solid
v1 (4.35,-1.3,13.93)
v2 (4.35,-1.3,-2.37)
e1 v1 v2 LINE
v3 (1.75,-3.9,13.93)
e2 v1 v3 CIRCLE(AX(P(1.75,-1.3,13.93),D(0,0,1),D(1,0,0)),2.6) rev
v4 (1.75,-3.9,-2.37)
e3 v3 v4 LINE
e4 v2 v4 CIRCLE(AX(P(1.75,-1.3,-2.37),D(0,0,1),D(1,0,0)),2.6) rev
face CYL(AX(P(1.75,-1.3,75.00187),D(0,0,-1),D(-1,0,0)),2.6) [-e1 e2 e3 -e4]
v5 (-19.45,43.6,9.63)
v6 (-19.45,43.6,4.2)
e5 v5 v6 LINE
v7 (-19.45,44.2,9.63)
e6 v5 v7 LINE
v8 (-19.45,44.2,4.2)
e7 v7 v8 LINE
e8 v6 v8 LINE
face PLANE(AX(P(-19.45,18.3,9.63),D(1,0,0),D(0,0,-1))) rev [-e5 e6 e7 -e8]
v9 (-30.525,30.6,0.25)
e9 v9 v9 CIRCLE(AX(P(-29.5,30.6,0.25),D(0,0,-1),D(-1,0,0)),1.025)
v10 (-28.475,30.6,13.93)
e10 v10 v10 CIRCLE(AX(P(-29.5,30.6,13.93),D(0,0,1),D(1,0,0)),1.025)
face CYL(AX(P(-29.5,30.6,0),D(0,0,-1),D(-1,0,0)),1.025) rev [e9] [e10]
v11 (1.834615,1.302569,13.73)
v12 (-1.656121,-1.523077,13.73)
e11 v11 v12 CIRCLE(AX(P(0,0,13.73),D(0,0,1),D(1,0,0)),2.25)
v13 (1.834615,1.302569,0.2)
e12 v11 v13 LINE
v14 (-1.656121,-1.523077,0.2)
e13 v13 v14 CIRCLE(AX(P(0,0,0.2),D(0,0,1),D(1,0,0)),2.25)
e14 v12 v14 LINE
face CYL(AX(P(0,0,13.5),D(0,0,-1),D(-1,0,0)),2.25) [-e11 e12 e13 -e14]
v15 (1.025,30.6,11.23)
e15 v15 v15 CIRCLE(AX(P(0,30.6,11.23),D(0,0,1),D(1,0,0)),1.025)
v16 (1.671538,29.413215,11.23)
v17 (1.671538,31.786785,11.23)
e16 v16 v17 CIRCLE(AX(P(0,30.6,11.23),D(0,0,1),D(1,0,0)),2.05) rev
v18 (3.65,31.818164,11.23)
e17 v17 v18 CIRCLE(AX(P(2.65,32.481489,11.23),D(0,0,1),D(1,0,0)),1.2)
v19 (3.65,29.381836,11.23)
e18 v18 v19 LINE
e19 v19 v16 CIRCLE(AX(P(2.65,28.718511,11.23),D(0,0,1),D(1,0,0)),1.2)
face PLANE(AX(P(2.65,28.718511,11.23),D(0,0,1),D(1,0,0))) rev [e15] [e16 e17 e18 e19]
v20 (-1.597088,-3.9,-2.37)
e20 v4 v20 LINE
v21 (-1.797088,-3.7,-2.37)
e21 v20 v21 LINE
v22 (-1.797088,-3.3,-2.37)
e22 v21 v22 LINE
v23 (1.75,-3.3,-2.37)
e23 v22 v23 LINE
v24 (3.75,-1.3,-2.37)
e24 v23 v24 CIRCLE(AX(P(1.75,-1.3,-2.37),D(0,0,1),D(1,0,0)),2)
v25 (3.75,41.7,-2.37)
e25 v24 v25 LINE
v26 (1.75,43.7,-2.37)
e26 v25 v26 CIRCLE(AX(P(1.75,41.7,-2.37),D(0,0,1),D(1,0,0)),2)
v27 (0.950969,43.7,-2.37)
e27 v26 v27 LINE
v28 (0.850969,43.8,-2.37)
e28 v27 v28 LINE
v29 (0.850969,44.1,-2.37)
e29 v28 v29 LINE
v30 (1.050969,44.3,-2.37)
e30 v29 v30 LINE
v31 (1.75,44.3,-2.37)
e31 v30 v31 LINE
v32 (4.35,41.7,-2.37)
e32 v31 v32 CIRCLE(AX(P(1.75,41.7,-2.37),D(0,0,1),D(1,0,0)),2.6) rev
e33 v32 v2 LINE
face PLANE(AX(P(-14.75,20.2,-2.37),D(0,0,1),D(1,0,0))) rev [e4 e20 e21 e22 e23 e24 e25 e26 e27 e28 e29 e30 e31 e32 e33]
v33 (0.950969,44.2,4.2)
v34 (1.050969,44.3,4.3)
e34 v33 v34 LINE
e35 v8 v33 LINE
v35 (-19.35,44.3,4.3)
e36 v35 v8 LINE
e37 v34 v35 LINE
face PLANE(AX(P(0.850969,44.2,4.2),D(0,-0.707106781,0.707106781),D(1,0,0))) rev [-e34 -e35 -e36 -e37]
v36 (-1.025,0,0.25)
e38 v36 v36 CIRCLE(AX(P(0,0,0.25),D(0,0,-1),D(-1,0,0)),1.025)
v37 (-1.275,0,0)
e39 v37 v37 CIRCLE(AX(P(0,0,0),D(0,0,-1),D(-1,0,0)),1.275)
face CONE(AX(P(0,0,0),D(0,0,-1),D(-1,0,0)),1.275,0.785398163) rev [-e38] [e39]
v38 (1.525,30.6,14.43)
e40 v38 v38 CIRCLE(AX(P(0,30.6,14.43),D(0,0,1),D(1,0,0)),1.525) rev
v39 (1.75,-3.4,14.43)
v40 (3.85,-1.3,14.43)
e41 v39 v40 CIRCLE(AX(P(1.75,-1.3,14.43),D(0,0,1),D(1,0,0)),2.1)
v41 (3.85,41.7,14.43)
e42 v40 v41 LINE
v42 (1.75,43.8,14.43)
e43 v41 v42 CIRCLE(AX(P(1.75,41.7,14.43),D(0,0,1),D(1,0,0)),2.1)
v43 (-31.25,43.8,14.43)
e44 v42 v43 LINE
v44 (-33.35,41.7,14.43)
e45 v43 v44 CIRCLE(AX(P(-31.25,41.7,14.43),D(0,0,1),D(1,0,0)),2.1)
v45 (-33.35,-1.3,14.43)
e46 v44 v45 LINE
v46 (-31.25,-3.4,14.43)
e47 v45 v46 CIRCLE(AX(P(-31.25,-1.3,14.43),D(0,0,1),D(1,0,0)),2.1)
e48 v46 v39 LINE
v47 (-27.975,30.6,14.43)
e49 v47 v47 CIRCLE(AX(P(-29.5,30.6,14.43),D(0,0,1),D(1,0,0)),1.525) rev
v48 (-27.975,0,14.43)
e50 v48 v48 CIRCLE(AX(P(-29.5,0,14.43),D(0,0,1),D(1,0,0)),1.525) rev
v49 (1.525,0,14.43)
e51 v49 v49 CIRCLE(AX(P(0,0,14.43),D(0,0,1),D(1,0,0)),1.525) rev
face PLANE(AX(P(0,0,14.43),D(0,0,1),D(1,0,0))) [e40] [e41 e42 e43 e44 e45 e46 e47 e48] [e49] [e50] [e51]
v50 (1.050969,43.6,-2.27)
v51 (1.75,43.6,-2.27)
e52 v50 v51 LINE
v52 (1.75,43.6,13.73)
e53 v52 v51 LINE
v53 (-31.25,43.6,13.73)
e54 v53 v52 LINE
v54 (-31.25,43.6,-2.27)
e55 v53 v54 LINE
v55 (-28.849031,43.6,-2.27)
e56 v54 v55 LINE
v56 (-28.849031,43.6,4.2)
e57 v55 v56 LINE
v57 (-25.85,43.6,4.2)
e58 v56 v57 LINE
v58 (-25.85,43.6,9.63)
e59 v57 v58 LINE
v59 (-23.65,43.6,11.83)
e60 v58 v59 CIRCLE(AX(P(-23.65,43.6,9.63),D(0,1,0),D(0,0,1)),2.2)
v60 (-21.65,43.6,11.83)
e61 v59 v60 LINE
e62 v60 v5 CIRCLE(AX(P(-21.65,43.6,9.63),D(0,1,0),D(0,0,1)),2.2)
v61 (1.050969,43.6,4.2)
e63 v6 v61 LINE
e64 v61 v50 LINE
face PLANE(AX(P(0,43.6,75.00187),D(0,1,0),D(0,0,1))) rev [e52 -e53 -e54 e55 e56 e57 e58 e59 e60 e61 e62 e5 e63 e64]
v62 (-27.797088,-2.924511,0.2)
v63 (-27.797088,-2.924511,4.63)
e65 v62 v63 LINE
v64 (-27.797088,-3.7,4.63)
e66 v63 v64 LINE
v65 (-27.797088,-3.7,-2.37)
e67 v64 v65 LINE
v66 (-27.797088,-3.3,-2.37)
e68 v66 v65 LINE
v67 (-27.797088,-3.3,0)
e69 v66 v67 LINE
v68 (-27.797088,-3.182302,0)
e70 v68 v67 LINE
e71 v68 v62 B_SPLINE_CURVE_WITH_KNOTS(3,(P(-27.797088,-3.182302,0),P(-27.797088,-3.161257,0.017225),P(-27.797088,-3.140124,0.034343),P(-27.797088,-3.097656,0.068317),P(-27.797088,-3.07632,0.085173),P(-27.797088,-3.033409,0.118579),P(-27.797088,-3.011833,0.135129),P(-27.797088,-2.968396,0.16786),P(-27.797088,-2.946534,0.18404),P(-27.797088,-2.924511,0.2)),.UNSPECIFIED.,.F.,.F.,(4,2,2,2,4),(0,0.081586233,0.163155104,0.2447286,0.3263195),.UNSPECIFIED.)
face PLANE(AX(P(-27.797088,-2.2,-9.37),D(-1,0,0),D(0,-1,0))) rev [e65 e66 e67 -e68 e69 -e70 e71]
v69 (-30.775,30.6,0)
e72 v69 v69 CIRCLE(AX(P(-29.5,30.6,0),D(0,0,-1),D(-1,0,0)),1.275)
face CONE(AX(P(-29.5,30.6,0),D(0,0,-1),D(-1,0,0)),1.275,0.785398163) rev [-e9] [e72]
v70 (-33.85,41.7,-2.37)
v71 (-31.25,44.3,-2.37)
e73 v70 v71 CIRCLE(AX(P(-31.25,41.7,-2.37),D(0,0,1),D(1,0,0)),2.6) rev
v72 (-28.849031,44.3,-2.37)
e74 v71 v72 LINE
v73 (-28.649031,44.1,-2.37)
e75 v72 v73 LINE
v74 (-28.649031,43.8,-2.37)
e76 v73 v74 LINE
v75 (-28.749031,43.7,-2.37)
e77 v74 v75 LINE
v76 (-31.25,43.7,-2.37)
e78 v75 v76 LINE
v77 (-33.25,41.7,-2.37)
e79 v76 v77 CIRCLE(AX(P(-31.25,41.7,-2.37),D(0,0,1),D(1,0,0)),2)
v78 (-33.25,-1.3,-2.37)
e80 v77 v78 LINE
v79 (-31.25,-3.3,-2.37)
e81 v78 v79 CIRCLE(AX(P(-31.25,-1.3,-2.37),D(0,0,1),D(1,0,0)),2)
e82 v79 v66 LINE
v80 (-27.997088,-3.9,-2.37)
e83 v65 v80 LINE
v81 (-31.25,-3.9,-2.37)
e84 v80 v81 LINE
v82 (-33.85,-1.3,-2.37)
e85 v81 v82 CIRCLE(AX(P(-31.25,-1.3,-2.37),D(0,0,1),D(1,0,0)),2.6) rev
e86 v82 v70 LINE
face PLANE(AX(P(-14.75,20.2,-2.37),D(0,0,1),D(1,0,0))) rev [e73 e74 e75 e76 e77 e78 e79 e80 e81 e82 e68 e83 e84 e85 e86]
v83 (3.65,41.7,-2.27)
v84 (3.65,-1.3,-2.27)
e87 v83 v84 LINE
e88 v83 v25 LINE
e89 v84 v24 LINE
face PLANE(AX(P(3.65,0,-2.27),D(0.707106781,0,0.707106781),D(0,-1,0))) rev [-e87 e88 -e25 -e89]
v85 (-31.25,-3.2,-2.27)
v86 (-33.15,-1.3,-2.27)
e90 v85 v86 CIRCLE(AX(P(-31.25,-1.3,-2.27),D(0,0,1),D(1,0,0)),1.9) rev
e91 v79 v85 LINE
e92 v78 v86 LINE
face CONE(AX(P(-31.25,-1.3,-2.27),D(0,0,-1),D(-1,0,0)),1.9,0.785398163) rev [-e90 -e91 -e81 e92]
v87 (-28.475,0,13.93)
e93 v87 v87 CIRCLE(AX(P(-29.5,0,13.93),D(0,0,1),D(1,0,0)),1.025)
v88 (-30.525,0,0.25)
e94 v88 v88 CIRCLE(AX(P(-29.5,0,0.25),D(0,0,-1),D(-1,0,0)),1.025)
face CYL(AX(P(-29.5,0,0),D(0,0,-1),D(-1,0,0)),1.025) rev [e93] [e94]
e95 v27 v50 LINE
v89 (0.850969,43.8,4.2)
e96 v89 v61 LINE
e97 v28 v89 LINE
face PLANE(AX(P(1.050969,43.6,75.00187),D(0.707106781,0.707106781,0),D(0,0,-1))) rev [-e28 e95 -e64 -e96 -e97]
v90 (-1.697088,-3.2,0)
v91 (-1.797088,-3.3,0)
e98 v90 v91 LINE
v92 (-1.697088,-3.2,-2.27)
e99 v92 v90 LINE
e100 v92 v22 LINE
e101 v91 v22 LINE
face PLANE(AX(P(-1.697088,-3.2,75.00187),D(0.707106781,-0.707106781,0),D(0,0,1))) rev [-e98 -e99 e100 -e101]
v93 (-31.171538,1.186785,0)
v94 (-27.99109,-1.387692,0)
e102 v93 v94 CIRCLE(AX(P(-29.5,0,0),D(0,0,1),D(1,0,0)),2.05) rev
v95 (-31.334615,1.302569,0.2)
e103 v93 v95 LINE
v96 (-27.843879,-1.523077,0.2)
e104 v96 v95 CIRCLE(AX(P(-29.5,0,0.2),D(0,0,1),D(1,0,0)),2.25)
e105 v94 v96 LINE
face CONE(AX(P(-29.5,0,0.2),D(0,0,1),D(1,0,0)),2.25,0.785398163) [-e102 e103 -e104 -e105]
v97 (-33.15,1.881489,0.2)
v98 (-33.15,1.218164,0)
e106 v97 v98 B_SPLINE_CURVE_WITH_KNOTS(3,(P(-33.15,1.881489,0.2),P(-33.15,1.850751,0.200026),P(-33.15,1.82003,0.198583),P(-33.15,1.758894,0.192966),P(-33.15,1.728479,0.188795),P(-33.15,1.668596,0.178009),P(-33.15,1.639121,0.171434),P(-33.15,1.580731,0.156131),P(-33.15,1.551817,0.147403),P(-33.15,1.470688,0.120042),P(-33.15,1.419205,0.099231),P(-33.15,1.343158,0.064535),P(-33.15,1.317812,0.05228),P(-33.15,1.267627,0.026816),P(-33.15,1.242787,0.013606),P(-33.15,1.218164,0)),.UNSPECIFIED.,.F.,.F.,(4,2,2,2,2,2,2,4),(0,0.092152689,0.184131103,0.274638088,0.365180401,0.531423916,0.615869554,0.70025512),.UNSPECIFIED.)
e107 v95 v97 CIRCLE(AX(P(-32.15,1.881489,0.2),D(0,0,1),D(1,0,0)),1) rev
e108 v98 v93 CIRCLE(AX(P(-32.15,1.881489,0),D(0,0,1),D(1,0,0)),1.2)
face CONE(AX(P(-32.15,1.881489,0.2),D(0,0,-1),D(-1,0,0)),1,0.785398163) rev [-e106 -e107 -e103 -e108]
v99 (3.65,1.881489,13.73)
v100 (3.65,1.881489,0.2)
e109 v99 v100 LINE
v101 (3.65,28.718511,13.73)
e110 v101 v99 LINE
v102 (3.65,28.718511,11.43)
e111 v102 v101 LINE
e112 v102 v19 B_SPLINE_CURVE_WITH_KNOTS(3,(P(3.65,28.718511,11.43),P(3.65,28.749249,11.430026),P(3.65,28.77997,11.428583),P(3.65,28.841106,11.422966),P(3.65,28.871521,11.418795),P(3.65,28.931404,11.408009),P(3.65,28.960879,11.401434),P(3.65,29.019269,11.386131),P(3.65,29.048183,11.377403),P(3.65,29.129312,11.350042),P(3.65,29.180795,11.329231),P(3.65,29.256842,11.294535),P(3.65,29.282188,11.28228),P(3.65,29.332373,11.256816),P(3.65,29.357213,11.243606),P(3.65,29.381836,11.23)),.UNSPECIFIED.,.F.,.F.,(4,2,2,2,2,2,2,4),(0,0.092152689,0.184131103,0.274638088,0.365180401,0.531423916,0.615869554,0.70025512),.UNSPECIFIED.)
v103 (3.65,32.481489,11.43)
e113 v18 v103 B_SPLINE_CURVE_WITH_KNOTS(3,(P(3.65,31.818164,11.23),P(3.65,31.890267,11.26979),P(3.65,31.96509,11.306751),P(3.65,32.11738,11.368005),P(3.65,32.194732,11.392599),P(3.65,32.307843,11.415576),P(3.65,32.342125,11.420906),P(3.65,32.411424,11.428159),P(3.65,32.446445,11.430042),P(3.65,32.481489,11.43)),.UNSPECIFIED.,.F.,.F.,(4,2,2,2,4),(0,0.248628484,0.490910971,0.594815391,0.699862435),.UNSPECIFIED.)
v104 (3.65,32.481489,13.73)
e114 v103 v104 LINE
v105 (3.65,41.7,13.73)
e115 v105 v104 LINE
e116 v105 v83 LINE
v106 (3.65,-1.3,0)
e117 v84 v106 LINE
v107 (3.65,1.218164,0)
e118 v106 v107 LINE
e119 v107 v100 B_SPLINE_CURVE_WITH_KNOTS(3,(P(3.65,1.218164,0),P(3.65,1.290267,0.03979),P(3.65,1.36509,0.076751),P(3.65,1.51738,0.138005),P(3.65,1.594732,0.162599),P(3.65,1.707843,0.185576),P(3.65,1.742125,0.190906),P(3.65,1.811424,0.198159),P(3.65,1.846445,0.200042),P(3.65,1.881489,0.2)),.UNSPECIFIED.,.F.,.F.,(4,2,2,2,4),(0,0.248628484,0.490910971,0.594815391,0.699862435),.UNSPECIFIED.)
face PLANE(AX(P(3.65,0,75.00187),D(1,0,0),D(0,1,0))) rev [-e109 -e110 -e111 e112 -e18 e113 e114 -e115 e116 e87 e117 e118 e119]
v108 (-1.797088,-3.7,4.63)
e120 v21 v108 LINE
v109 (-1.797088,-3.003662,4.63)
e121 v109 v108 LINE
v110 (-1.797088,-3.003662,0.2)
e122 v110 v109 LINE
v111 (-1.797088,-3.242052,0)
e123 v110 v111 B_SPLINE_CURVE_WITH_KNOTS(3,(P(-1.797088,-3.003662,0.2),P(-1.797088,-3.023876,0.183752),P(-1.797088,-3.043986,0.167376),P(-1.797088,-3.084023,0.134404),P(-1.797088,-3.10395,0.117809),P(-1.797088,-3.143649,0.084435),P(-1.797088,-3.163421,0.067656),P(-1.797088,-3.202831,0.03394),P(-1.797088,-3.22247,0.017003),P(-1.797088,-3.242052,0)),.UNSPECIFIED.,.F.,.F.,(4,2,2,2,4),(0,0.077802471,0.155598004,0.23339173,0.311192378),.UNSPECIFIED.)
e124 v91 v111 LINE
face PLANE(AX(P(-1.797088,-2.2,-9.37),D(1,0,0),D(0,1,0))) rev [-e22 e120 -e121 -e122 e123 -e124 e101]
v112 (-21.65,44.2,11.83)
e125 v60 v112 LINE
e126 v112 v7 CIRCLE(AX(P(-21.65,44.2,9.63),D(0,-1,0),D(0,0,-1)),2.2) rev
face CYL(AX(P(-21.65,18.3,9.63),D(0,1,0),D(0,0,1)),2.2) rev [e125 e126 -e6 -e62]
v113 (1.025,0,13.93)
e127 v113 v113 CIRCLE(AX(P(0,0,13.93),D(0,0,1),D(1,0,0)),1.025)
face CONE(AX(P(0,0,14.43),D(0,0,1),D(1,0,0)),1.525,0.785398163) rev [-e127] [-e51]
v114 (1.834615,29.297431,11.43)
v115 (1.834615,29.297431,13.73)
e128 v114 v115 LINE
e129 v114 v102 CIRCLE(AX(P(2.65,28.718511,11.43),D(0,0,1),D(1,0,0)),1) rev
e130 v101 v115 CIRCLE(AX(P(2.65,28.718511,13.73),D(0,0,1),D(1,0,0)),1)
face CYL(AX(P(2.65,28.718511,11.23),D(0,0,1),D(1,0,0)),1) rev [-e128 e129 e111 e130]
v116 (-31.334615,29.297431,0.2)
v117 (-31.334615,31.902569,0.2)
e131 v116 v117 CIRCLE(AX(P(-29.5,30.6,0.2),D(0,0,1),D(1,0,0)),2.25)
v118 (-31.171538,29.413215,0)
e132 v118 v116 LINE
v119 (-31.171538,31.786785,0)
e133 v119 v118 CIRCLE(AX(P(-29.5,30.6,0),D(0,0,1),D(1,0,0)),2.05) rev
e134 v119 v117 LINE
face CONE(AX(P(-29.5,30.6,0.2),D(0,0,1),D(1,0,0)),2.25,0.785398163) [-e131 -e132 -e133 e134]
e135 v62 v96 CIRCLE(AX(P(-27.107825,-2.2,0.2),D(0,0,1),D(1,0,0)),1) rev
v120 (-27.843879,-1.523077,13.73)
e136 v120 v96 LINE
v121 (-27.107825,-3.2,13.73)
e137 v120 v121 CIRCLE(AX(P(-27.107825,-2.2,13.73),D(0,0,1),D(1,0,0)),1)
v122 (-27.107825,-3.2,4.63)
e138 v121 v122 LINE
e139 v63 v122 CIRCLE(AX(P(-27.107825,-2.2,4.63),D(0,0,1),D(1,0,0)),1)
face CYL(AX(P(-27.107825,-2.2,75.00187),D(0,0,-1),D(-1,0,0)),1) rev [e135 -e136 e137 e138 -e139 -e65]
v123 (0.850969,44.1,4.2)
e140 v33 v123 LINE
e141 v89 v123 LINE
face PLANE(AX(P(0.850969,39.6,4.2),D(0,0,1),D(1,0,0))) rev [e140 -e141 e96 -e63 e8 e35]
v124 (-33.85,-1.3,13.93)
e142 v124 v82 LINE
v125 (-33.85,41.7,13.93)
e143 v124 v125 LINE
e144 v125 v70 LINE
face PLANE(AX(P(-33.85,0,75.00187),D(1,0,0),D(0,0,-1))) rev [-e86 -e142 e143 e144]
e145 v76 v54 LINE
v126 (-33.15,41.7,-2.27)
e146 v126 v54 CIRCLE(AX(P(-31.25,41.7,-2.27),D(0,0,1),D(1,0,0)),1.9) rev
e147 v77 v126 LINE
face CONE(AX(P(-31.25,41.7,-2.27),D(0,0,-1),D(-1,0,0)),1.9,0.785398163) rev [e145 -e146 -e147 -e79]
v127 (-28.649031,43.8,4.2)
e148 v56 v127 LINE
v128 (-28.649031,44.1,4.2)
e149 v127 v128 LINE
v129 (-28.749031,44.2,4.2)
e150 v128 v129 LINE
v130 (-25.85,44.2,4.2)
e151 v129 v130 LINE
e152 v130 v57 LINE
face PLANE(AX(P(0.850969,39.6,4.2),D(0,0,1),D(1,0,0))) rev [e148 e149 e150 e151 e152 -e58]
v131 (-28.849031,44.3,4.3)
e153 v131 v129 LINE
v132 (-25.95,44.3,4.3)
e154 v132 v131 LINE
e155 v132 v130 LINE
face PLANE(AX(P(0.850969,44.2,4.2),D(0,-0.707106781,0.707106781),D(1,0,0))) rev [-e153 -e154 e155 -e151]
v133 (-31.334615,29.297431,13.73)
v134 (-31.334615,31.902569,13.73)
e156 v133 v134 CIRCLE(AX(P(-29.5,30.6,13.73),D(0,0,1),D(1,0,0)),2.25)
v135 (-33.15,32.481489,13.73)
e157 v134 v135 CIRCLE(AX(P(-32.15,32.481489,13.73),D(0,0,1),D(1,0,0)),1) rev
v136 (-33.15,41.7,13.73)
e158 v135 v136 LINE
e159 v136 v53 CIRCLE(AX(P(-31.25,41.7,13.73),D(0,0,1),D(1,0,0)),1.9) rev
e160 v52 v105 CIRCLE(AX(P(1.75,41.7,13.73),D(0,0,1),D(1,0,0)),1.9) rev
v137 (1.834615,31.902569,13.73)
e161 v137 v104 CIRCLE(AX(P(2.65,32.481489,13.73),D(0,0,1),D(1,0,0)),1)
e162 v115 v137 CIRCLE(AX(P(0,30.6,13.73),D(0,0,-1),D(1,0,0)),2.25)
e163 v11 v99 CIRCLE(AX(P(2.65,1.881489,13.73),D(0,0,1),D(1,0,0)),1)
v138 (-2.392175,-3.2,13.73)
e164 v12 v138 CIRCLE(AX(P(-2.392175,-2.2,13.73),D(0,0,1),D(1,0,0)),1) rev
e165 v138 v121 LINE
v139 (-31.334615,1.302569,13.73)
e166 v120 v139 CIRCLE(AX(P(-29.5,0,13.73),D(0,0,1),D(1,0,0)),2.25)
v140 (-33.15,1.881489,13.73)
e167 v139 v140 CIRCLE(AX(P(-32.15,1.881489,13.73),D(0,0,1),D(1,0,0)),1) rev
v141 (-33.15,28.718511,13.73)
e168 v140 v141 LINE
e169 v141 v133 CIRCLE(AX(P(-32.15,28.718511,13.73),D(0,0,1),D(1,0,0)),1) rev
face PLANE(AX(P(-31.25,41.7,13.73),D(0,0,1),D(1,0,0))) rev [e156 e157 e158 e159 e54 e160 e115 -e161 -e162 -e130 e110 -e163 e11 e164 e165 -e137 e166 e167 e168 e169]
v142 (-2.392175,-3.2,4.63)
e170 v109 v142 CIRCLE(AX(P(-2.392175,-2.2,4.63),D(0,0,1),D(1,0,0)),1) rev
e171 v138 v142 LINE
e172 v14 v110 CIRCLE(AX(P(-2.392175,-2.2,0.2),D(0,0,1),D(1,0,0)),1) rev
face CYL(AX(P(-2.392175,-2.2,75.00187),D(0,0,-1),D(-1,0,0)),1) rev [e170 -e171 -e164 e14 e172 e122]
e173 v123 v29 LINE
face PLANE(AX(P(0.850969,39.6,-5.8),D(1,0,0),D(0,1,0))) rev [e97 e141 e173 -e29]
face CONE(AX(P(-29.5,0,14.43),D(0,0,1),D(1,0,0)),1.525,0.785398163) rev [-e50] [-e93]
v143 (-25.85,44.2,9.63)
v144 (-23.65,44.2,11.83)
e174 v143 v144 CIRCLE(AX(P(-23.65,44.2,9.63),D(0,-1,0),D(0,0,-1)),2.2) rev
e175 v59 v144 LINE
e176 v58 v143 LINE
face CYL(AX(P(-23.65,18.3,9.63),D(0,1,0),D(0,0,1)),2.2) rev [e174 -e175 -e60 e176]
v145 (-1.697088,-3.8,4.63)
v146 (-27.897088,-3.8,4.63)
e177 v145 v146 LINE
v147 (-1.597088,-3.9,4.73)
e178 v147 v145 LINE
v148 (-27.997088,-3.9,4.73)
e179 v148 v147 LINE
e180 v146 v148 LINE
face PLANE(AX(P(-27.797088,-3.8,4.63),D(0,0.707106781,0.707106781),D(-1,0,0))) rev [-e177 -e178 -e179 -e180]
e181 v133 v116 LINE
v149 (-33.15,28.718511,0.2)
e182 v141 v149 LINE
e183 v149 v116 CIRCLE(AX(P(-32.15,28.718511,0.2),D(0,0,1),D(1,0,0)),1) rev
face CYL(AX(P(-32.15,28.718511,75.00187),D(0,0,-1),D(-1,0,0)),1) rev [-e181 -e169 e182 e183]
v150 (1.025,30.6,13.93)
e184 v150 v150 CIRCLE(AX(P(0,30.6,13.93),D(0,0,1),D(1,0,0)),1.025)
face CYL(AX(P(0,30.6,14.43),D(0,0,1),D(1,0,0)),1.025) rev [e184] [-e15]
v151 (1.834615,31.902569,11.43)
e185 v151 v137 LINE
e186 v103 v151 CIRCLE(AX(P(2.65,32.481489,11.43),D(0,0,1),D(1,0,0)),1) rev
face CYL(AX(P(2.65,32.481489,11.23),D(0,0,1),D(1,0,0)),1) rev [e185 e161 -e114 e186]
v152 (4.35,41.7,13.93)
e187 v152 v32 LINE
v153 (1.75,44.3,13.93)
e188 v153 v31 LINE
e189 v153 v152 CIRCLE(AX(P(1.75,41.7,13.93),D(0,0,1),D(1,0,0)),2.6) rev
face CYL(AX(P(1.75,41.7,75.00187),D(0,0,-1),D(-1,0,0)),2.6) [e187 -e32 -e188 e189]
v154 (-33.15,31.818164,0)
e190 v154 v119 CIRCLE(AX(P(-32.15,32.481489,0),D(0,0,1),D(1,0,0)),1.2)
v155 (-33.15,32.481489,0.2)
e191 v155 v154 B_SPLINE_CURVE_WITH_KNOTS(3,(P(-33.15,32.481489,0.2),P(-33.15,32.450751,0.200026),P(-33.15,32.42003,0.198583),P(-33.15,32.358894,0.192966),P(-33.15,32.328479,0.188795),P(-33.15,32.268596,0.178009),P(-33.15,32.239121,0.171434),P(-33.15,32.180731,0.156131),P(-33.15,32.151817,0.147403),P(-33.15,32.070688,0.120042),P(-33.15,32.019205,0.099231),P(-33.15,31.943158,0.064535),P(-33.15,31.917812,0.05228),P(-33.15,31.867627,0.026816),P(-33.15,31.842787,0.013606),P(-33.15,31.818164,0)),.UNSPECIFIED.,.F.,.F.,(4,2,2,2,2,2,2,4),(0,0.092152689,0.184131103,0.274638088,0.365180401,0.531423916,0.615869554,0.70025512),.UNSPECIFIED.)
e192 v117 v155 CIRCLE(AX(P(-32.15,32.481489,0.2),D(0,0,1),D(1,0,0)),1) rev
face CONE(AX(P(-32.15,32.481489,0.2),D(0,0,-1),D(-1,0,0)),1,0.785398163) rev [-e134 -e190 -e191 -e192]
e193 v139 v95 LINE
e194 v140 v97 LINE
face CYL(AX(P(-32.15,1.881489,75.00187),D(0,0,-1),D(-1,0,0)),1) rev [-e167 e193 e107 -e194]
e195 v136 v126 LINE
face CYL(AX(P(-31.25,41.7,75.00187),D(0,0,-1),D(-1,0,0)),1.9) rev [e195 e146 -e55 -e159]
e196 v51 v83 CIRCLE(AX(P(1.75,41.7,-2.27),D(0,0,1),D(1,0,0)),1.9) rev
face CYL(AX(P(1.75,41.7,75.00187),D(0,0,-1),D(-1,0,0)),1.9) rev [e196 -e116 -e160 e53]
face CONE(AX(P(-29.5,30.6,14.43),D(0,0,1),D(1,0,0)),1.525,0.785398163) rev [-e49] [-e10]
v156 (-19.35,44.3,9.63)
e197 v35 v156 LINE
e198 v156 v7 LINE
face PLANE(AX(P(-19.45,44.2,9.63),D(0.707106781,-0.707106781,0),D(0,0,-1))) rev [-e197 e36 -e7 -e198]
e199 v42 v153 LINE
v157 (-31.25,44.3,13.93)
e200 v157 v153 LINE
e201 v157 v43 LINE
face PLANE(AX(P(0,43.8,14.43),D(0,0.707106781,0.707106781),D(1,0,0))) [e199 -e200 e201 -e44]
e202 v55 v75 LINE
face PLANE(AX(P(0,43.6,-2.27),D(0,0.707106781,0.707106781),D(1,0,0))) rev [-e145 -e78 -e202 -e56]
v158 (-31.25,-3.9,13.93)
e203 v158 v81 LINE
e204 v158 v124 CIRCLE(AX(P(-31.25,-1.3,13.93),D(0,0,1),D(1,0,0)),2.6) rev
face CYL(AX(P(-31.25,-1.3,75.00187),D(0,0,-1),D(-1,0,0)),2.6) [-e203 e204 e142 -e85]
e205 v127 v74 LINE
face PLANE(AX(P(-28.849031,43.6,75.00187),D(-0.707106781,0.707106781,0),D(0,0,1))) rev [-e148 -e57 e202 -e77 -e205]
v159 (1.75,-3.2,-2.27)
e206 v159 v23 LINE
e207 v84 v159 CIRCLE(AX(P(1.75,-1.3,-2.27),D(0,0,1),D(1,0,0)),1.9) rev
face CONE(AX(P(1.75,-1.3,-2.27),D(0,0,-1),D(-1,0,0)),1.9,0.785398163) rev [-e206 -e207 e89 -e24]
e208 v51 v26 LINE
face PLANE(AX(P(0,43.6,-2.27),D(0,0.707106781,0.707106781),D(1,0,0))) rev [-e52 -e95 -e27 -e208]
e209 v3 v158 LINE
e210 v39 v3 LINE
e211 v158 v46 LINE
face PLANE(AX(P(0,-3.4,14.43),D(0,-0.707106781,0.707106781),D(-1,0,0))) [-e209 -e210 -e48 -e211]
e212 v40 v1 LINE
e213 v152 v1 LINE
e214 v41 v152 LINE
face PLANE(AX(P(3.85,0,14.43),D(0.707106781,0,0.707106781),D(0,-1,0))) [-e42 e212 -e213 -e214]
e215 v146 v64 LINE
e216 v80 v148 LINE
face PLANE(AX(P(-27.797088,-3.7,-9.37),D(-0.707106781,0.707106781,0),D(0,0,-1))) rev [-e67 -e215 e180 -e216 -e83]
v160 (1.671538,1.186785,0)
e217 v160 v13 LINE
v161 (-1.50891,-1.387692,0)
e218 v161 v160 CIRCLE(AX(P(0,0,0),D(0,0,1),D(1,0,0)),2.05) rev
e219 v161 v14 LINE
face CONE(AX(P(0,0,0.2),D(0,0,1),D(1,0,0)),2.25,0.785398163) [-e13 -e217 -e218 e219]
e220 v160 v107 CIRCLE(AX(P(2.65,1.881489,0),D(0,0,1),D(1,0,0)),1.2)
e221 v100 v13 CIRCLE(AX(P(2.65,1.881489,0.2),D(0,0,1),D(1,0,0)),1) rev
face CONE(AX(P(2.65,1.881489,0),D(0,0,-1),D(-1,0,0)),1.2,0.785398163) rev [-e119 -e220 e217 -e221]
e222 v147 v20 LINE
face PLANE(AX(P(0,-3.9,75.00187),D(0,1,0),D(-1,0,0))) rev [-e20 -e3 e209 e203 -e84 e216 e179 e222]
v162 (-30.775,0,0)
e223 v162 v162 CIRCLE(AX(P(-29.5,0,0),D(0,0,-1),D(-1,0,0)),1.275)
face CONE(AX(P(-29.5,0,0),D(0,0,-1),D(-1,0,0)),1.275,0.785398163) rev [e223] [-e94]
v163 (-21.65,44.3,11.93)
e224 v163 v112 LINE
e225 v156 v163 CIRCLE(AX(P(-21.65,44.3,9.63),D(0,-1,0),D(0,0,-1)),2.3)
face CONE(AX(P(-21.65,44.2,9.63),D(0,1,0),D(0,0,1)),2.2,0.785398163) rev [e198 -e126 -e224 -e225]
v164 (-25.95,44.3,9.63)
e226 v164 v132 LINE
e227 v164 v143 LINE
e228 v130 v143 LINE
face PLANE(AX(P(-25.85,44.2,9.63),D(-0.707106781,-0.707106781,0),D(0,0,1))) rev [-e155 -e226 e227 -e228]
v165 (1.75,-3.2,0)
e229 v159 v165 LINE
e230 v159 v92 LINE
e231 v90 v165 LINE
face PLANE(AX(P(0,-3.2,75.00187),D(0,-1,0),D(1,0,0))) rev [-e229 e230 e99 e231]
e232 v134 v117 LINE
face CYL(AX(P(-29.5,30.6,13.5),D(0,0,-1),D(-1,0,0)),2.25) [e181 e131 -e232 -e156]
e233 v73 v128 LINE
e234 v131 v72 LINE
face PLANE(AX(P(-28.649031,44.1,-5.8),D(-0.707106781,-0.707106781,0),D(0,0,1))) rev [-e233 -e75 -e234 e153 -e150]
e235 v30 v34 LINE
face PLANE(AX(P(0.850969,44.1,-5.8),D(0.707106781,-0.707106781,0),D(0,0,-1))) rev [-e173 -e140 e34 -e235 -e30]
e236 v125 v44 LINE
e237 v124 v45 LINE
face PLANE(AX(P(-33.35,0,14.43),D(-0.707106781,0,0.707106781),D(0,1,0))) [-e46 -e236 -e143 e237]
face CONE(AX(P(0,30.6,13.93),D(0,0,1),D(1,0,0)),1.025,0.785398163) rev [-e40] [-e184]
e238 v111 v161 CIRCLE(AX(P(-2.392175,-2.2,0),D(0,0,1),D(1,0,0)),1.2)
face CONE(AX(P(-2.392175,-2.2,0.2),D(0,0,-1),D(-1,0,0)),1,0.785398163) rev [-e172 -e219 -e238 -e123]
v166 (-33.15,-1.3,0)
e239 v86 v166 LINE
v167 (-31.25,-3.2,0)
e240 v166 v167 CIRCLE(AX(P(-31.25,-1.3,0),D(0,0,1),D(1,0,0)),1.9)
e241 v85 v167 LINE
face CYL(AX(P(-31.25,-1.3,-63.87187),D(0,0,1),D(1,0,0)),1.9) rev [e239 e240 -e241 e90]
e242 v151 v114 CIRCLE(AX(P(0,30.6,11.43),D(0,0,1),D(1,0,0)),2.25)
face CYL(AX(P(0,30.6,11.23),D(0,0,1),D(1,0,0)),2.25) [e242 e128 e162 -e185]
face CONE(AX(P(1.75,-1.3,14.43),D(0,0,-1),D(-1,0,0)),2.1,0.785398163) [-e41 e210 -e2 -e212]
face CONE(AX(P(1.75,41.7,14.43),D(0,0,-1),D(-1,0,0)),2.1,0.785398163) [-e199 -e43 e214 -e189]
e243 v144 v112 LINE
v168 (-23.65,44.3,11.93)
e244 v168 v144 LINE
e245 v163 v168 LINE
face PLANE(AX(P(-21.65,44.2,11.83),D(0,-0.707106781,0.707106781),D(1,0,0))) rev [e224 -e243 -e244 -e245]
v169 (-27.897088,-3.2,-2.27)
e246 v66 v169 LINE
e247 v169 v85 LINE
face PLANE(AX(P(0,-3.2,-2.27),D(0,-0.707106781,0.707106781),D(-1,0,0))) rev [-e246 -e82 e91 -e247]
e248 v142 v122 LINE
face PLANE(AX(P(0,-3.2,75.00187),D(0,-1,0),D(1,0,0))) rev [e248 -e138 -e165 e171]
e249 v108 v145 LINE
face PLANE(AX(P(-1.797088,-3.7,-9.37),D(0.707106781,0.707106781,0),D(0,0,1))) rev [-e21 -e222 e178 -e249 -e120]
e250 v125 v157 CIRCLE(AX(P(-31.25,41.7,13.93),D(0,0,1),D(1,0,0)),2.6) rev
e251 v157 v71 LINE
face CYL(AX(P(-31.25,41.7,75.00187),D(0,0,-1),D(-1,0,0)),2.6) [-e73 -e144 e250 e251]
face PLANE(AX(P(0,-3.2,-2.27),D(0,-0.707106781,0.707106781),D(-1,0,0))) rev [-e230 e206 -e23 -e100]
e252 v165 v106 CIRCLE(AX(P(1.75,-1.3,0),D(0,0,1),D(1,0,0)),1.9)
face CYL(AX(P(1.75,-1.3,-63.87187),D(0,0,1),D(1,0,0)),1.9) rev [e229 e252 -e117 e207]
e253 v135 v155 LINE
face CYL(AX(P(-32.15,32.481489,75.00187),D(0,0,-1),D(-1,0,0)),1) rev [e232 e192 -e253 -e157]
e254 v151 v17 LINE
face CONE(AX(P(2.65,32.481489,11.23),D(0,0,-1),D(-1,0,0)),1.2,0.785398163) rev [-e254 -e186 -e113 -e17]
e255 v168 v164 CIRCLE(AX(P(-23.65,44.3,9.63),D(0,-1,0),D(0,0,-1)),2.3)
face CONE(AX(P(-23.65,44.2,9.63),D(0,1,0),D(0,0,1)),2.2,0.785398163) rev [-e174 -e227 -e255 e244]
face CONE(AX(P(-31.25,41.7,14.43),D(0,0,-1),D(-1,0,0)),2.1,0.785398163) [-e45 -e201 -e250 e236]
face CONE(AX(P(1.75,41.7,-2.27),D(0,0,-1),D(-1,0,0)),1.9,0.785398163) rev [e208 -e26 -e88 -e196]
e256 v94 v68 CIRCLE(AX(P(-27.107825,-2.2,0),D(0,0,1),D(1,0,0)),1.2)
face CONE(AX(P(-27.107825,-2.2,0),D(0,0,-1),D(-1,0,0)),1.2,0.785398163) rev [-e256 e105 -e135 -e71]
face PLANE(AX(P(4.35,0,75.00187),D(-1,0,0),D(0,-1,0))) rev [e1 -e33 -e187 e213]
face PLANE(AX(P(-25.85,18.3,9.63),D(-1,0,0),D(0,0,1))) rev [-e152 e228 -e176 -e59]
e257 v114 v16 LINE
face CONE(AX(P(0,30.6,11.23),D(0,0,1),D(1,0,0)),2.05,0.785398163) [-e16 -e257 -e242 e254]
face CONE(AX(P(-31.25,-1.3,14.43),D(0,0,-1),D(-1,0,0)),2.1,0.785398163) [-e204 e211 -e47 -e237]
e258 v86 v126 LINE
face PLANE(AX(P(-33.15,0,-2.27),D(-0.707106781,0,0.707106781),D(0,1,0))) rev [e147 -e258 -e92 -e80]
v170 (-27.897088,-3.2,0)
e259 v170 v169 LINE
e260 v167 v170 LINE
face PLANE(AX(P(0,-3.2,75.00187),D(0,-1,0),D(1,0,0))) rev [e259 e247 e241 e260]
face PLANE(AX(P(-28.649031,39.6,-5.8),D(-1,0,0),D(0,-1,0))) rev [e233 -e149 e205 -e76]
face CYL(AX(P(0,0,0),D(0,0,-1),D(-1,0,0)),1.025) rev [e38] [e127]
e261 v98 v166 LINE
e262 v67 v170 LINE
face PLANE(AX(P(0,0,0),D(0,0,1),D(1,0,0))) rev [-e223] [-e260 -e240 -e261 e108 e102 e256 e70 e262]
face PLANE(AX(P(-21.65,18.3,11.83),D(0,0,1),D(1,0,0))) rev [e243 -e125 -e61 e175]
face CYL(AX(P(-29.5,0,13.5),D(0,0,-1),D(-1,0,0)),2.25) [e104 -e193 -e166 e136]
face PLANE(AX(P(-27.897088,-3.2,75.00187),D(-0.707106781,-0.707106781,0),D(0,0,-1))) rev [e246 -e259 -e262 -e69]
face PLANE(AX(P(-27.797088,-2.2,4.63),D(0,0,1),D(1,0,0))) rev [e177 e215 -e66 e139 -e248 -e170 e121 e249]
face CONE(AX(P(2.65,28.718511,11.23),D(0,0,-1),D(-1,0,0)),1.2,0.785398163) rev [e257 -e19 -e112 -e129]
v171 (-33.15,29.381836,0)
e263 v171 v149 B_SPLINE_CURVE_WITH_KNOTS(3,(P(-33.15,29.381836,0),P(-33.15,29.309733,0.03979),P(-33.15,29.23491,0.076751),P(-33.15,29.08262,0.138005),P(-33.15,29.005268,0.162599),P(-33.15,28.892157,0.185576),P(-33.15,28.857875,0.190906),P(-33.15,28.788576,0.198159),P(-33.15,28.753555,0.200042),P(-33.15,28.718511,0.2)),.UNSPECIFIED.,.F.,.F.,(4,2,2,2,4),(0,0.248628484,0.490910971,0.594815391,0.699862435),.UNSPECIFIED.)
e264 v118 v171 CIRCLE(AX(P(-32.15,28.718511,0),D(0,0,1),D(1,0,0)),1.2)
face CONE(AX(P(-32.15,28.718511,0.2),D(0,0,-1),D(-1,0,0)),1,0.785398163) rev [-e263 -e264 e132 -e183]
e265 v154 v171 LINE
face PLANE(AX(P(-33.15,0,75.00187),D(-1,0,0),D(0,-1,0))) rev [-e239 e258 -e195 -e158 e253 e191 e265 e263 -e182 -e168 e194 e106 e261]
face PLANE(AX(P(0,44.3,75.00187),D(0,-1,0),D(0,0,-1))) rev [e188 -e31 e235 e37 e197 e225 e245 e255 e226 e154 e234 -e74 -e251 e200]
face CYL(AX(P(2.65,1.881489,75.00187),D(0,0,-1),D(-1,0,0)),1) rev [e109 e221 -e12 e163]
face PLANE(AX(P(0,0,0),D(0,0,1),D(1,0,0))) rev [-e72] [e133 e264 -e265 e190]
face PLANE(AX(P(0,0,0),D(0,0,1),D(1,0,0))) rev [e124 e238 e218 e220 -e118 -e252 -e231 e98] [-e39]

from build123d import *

# Parameters (mm, degrees)
SKETCH_1_R              = 2.25
EXTRUDE_1_DEPTH         = 13.5
EXTRUDE_1_2_DEPTH       = 13.5
EXTRUDE_1_3_DEPTH       = 13.5
EXTRUDE_2_DEPTH         = 1.57
EXTRUDE_3_DEPTH         = 0.8
EXTRUDE_4_DEPTH         = 13.5
SKETCH_19_W             = 26
SKETCH_19_H             = 14
CUT_EXTRUDE_2_DEPTH     = 1.7
SKETCH_20_W             = 29.5
SKETCH_20_H             = 10
CUT_EXTRUDE_3_DEPTH     = 4.7
MOVE_START              = 13.5
MOVE_FACE_4_DEPTH       = 0.93
EXTRUDE_5_DEPTH         = 0.7
M2_5X0_451_D            = 2.05
M2_5X0_451_CSINK_D      = 2.55
M2_5X0_451_CSINK_ANGLE  = 90
CUT_EXTRUDE_4_DEPTH     = 26
CHAMFER_5_SIZE          = 0.2
CHAMFER_1_SIZE          = 0.1
CHAMFER_2_SIZE          = 0.2
EXTRUDE_6_DEPTH         = 2.5
HOLE_WIZARD_M2_51_D     = 2.05
HOLE_WIZARD_M2_51_DEPTH = 7.25
HOLE_WIZARD_M2_51_TIP   = 0.615882135
CHAMFER_3_SIZE          = 0.5
CHAMFER_4_SIZE          = 0.5
CHAMFER_7_SIZE          = 0.2


# Read off the part's stored shape, not the designer's step: Переместить грань4
with BuildPart() as part:
    # Эскиз1 → Бобышка-Вытянуть1 (new body)
    with BuildSketch(Plane.XY):
        Circle(SKETCH_1_R)
    extrude(amount=EXTRUDE_1_DEPTH)



with BuildPart() as body_2:
    # Эскиз1 → Extrude 1 2 (new body)
    with BuildSketch(Plane.XY):
        with Locations((-29.5, 0)):
            Circle(SKETCH_1_R)
    extrude(amount=EXTRUDE_1_2_DEPTH)


with BuildPart() as body_3:
    # Эскиз1 → Extrude 1 3 (new body)
    with BuildSketch(Plane.XY):
        with Locations((-29.5, 30.6)):
            Circle(SKETCH_1_R)
    extrude(amount=EXTRUDE_1_3_DEPTH)


with BuildPart() as body_4:
    # Эскиз2 → Бобышка-Вытянуть2 (new body)
    with BuildSketch(Plane.XY.offset(-0.8)):
        with BuildLine():
            Line((-31.25, -3.9), (1.75, -3.9))
            ThreePointArc((1.75, -3.9), (3.588477631, -3.138477631), (4.35, -1.3))
            Line((4.35, -1.3), (4.35, 41.7))
            ThreePointArc((4.35, 41.7), (3.588477631, 43.538477631), (1.75, 44.3))
            Line((1.75, 44.3), (-31.25, 44.3))
            ThreePointArc((-31.25, 44.3), (-33.088477631, 43.538477631), (-33.85, 41.7))
            Line((-33.85, 41.7), (-33.85, -1.3))
            ThreePointArc((-33.85, -1.3), (-33.088477631, -3.138477631), (-31.25, -3.9))
        make_face()
        with BuildLine():
            Line((-33.15, 41.7), (-33.15, -1.3))
            ThreePointArc((-33.15, -1.3), (-32.593502884, -2.643502884), (-31.25, -3.2))
            Line((-31.25, -3.2), (1.75, -3.2))
            ThreePointArc((1.75, -3.2), (3.093502884, -2.643502884), (3.65, -1.3))
            Line((3.65, -1.3), (3.65, 41.7))
            ThreePointArc((3.65, 41.7), (3.093502884, 43.043502884), (1.75, 43.6))
            Line((1.75, 43.6), (-31.25, 43.6))
            ThreePointArc((-31.25, 43.6), (-32.593502884, 43.043502884), (-33.15, 41.7))
        make_face(mode=Mode.SUBTRACT)
    extrude(amount=-EXTRUDE_2_DEPTH)

    # Эскиз3 → Бобышка-Вытянуть3 (add)
    with BuildSketch(Plane.XY.offset(-0.8)):
        with BuildLine():
            Line((-31.25, -3.9), (1.75, -3.9))
            ThreePointArc((1.75, -3.9), (3.588477631, -3.138477631), (4.35, -1.3))
            Line((4.35, -1.3), (4.35, 41.7))
            ThreePointArc((4.35, 41.7), (3.588477631, 43.538477631), (1.75, 44.3))
            Line((1.75, 44.3), (-31.25, 44.3))
            ThreePointArc((-31.25, 44.3), (-33.088477631, 43.538477631), (-33.85, 41.7))
            Line((-33.85, 41.7), (-33.85, -1.3))
            ThreePointArc((-33.85, -1.3), (-33.088477631, -3.138477631), (-31.25, -3.9))
        make_face()
        with BuildLine():
            Line((1.75, 43.6), (-31.25, 43.6))
            ThreePointArc((-31.25, 43.6), (-32.593502884, 43.043502884), (-33.15, 41.7))
            Line((-33.15, 41.7), (-33.15, -1.3))
            ThreePointArc((-33.15, -1.3), (-32.593502884, -2.643502884), (-31.25, -3.2))
            Line((-31.25, -3.2), (1.75, -3.2))
            ThreePointArc((1.75, -3.2), (3.093502884, -2.643502884), (3.65, -1.3))
            Line((3.65, -1.3), (3.65, 41.7))
            ThreePointArc((3.65, 41.7), (3.093502884, 43.043502884), (1.75, 43.6))
        make_face(mode=Mode.SUBTRACT)
    extrude(amount=EXTRUDE_3_DEPTH)


with BuildPart() as part_1:
    add(part.part)

    add(body_2.part)  # Бобышка-Вытянуть4 merges body 2

    add(body_3.part)  # Бобышка-Вытянуть4 merges body 3

    add(body_4.part)  # Бобышка-Вытянуть4 merges body 4
    # Эскиз5 → Бобышка-Вытянуть4 (add)
    # profile 1 of 4: a face of its own
    with BuildSketch(Plane.XY):
        with BuildLine():
            ThreePointArc((-31.25, 44.3), (-33.088477631, 43.538477631), (-33.85, 41.7))
            Line((-33.85, 41.7), (-33.85, -1.3))
            ThreePointArc((-33.85, -1.3), (-33.088477631, -3.138477631), (-31.25, -3.9))
            Line((-31.25, -3.9), (1.75, -3.9))
            ThreePointArc((1.75, -3.9), (3.588477631, -3.138477631), (4.35, -1.3))
            Line((4.35, -1.3), (4.35, 41.7))
            ThreePointArc((4.35, 41.7), (3.588477631, 43.538477631), (1.75, 44.3))
            Line((1.75, 44.3), (-31.25, 44.3))
        make_face()
        with BuildLine():
            Line((-33.15, -1.3), (-33.15, 41.7))
            ThreePointArc((-33.15, 41.7), (-32.593502884, 43.043502884), (-31.25, 43.6))
            Line((-31.25, 43.6), (1.75, 43.6))
            ThreePointArc((1.75, 43.6), (3.093502884, 43.043502884), (3.65, 41.7))
            Line((3.65, 41.7), (3.65, -1.3))
            ThreePointArc((3.65, -1.3), (3.093502884, -2.643502884), (1.75, -3.2))
            Line((1.75, -3.2), (-31.25, -3.2))
            ThreePointArc((-31.25, -3.2), (-32.593502884, -2.643502884), (-33.15, -1.3))
        make_face(mode=Mode.SUBTRACT)
    # profile 2 of 4: a face of its own
    with BuildSketch(Plane.XY):
        with BuildLine():
            ThreePointArc((-31.334615385, 1.30256915), (-32.45382181, 0.928759898), (-33.15, 1.881488772))
            Line((-33.15, 1.881488772), (-33.15, -1.3))
            ThreePointArc((-33.15, -1.3), (-32.593502884, -2.643502884), (-31.25, -3.2))
            Line((-31.25, -3.2), (-27.107825257, -3.2))
            ThreePointArc((-27.107825257, -3.2), (-28.023500712, -2.601918476), (-27.843879024, -1.523076923))
            ThreePointArc((-27.843879024, -1.523076923), (-30.915639077, -1.74884705), (-31.334615385, 1.30256915))
        make_face()
    # profile 3 of 4: a face of its own
    with BuildSketch(Plane.XY):
        with BuildLine():
            ThreePointArc((-1.656120976, -1.523076923), (-1.476499288, -2.601918476), (-2.392174743, -3.2))
            Line((-2.392174743, -3.2), (1.75, -3.2))
            ThreePointArc((1.75, -3.2), (3.093502884, -2.643502884), (3.65, -1.3))
            Line((3.65, -1.3), (3.65, 1.881488772))
            ThreePointArc((3.65, 1.881488772), (2.95382181, 0.928759898), (1.834615385, 1.30256915))
            ThreePointArc((1.834615385, 1.30256915), (2.143639967, 0.683599073), (2.25, 0))
            ThreePointArc((2.25, 0), (0.817382348, -2.096279108), (-1.656120976, -1.523076923))
        make_face()
    # profile 4 of 4: a face of its own
    with BuildSketch(Plane.XY):
        with BuildLine():
            Line((-33.15, 32.481488772), (-33.15, 28.718511228))
            ThreePointArc((-33.15, 28.718511228), (-32.45382181, 29.671240102), (-31.334615385, 29.29743085))
            ThreePointArc((-31.334615385, 29.29743085), (-31.75, 30.6), (-31.334615385, 31.90256915))
            ThreePointArc((-31.334615385, 31.90256915), (-32.45382181, 31.528759898), (-33.15, 32.481488772))
        make_face()
    extrude(amount=EXTRUDE_4_DEPTH)

    # Эскиз19 → Вырез-Вытянуть2 (cut)
    with BuildSketch(Plane.XZ.offset(3.9)):
        with Locations((-14.797088434, -2.37)):
            Rectangle(SKETCH_19_W, SKETCH_19_H)
    extrude(amount=-CUT_EXTRUDE_2_DEPTH, mode=Mode.SUBTRACT)

    # Эскиз20 → Вырез-Вытянуть3 (cut)
    with BuildSketch(Plane(origin=(0, 44.3, 0), x_dir=(1, 0, 0), z_dir=(0, 1, 0))):
        with Locations((-13.899030762, 0.8)):
            Rectangle(SKETCH_20_W, SKETCH_20_H)
    extrude(amount=-CUT_EXTRUDE_3_DEPTH, mode=Mode.SUBTRACT)

    # Move Face 4 outline → Move Face 4 (add)
    with BuildSketch(Plane.XY.offset(MOVE_START)):
        with BuildLine():
            Line((-33.85, 41.7), (-33.85, -1.3))
            ThreePointArc((-33.85, -1.3), (-33.088477631, -3.138477631), (-31.25, -3.9))
            Line((-31.25, -3.9), (1.75, -3.9))
            ThreePointArc((1.75, -3.9), (3.588477631, -3.138477631), (4.35, -1.3))
            Line((4.35, -1.3), (4.35, 41.7))
            ThreePointArc((4.35, 41.7), (3.588477631, 43.538477631), (1.75, 44.3))
            Line((1.75, 44.3), (-31.25, 44.3))
            ThreePointArc((-31.25, 44.3), (-33.088477631, 43.538477631), (-33.85, 41.7))
        make_face()
        with BuildLine():
            ThreePointArc((-31.334615385, 31.90256915), (-32.45382181, 31.528759898), (-33.15, 32.481488772))
            Line((-33.15, 32.481488772), (-33.15, 41.7))
            ThreePointArc((-33.15, 41.7), (-32.593502884, 43.043502884), (-31.25, 43.6))
            Line((-31.25, 43.6), (1.75, 43.6))
            ThreePointArc((1.75, 43.6), (3.093502884, 43.043502884), (3.65, 41.7))
            Line((3.65, 41.7), (3.65, 1.881488772))
            ThreePointArc((3.65, 1.881488772), (2.95382181, 0.928759898), (1.834615385, 1.30256915))
            ThreePointArc((1.834615385, 1.30256915), (-1.415639077, 1.74884705), (-1.656120976, -1.523076923))
            ThreePointArc((-1.656120976, -1.523076923), (-1.476499288, -2.601918476), (-2.392174743, -3.2))
            Line((-2.392174743, -3.2), (-27.107825257, -3.2))
            ThreePointArc((-27.107825257, -3.2), (-28.023500712, -2.601918476), (-27.843879024, -1.523076923))
            ThreePointArc((-27.843879024, -1.523076923), (-28.084360923, 1.74884705), (-31.334615385, 1.30256915))
            ThreePointArc((-31.334615385, 1.30256915), (-32.45382181, 0.928759898), (-33.15, 1.881488772))
            Line((-33.15, 1.881488772), (-33.15, 28.718511228))
            ThreePointArc((-33.15, 28.718511228), (-32.45382181, 29.671240102), (-31.334615385, 29.29743085))
            ThreePointArc((-31.334615385, 29.29743085), (-27.25, 30.6), (-31.334615385, 31.90256915))
        make_face(mode=Mode.SUBTRACT)
    extrude(amount=MOVE_FACE_4_DEPTH)

    # Эскиз25 → Бобышка-Вытянуть5 (add)
    with BuildSketch(Plane.XY.offset(14.43)):
        with BuildLine():
            Line((-33.85, 41.7), (-33.85, -1.3))
            ThreePointArc((-33.85, -1.3), (-33.088477631, -3.138477631), (-31.25, -3.9))
            Line((-31.25, -3.9), (1.75, -3.9))
            ThreePointArc((1.75, -3.9), (3.588477631, -3.138477631), (4.35, -1.3))
            Line((4.35, -1.3), (4.35, 41.7))
            ThreePointArc((4.35, 41.7), (3.588477631, 43.538477631), (1.75, 44.3))
            Line((1.75, 44.3), (-31.25, 44.3))
            ThreePointArc((-31.25, 44.3), (-33.088477631, 43.538477631), (-33.85, 41.7))
        make_face()
    extrude(amount=-EXTRUDE_5_DEPTH)

    # Отверстие обработанное метчиком M2.5x0.451 (through all)
    with Locations(Plane(origin=(0, 0, 0), x_dir=(-1, 0, 0), z_dir=(0, 0, -1))):
        with Locations((0, 0), (29.5, 0), (29.5, 30.6)):
            CounterSinkHole(M2_5X0_451_D / 2, M2_5X0_451_CSINK_D / 2, counter_sink_angle=M2_5X0_451_CSINK_ANGLE)

    # Эскиз29 → Вырез-Вытянуть4 (cut)
    with BuildSketch(Plane(origin=(0, 44.3, 0), x_dir=(1, 0, 0), z_dir=(0, 1, 0))):
        with BuildLine():
            Line((-21.65, -11.83), (-23.65, -11.83))
            ThreePointArc((-23.65, -11.83), (-25.205634919, -11.185634919), (-25.85, -9.63))
            Line((-25.85, -9.63), (-25.85, -4.2))
            Line((-25.85, -4.2), (-19.45, -4.2))
            Line((-19.45, -4.2), (-19.45, -9.63))
            ThreePointArc((-19.45, -9.63), (-20.094365081, -11.185634919), (-21.65, -11.83))
        make_face()
    extrude(amount=-CUT_EXTRUDE_4_DEPTH, mode=Mode.SUBTRACT)

    # Фаска5
    chamfer_5_edges = [part_1.edges().sort_by_distance(p)[0] for p in [
        (-1.797088434, -3.9, 1.13),
        (-27.797088434, -3.9, 1.13),
        (-28.649030762, 43.6, 0.915),
        (0.850969238, 43.6, 0.915),
        (-28.649030762, 44.3, 0.915),
        (0.850969238, 44.3, 0.915),
    ]]
    chamfer(chamfer_5_edges, length=CHAMFER_5_SIZE)

    # Фаска1
    chamfer_1_edges = [part_1.edges().sort_by_distance(p)[0] for p in [
        (3.093502884, 43.043502884, -2.37),
        (3.65, 20.2, -2.37),
        (3.093502884, -2.643502884, -2.37),
        (-0.023544217, -3.2, -2.37),
        (1.400484619, 43.6, -2.37),
        (-29.523544217, -3.2, -2.37),
        (-32.593502884, -2.643502884, -2.37),
        (-33.15, 20.2, -2.37),
        (-32.593502884, 43.043502884, -2.37),
        (-30.049515381, 43.6, -2.37),
        (-27.349515381, 44.3, 4.2),
        (-25.85, 44.3, 6.915),
        (-25.205634919, 44.3, 11.185634919),
        (-22.65, 44.3, 11.83),
        (-20.094365081, 44.3, 11.185634919),
        (-19.45, 44.3, 6.915),
        (-9.199515381, 44.3, 4.2),
        (-14.797088434, -3.9, 4.63),
        (-27.797088434, -3.2, -1.185),
        (-1.797088434, -3.2, -1.185),
    ]]
    chamfer(chamfer_1_edges, length=CHAMFER_1_SIZE)

    # Фаска2
    # the kernel refuses this chamfer: 0.2 mm, written as the material it takes off along each edge
    with BuildSketch(Plane(origin=(-32.15, 1.881488772, 0), x_dir=(0.8153846153846122, -0.5789196222223671, 0), z_dir=(0.5789196222223671, 0.8153846153846122, 0))) as chamfer_2_piece_1_section:
        Polygon((1, -CHAMFER_2_SIZE), (1 + CHAMFER_2_SIZE, 0), (1, 0), align=None)
    chamfer_2_piece_1 = revolve(axis=Axis((-32.15, 1.881488772, 0), (0, 0, -1)), revolution_arc=174.125308708, mode=Mode.PRIVATE)
    chamfer_2_piece_1 = split(chamfer_2_piece_1, bisect_by=Plane(origin=(-33.15, 0.835809247, 0.097562569), z_dir=(1, 0, 0)), keep=Keep.TOP, mode=Mode.PRIVATE)
    add(chamfer_2_piece_1, mode=Mode.SUBTRACT)
    with BuildSketch(Plane(origin=(-32.15, 28.718511228, 0), x_dir=(-0.8703565626431264, -0.4924220282075544, 0), z_dir=(0.4924220282075544, -0.8703565626431264, 0))) as chamfer_2_piece_2_section:
        Polygon((1, -CHAMFER_2_SIZE), (1 + CHAMFER_2_SIZE, 0), (1, 0), align=None)
    chamfer_2_piece_2 = revolve(axis=Axis((-32.15, 28.718511228, 0), (0, 0, -1)), revolution_arc=174.125308708, mode=Mode.PRIVATE)
    chamfer_2_piece_2 = split(chamfer_2_piece_2, bisect_by=Plane(origin=(-33.15, 29.764190781, 0.097562571), z_dir=(1, 0, 0)), keep=Keep.TOP, mode=Mode.PRIVATE)
    add(chamfer_2_piece_2, mode=Mode.SUBTRACT)
    with BuildSketch(Plane(origin=(-32.15, 32.481488772, 0), x_dir=(0.8153846153846069, -0.5789196222223744, 0), z_dir=(0.5789196222223744, 0.8153846153846069, 0))) as chamfer_2_piece_3_section:
        Polygon((1 + CHAMFER_2_SIZE, 0), (1, -CHAMFER_2_SIZE), (1, 0), align=None)
    chamfer_2_piece_3 = revolve(axis=Axis((-32.15, 32.481488772, 0), (0, 0, -1)), revolution_arc=174.125308708, mode=Mode.PRIVATE)
    chamfer_2_piece_3 = split(chamfer_2_piece_3, bisect_by=Plane(origin=(-33.15, 31.724660289, 0.056714395), z_dir=(1, 0, 0)), keep=Keep.TOP, mode=Mode.PRIVATE)
    add(chamfer_2_piece_3, mode=Mode.SUBTRACT)
    with BuildSketch(Plane(origin=(-2.392174743, -2.2, 0), x_dir=(0.73605376700958, 0.6769230769230777, 0), z_dir=(-0.6769230769230777, 0.73605376700958, 0))) as chamfer_2_piece_4:
        Polygon((1, -CHAMFER_2_SIZE), (1 + CHAMFER_2_SIZE, 0), (1, 0), align=None)
    revolve(axis=Axis((-2.392174743, -2.2, 0), (0, 0, -1)), revolution_arc=125.567691414, mode=Mode.SUBTRACT)
    with BuildSketch(Plane(origin=(-27.107825257, -2.2, 0), x_dir=(-0.24346114137000507, -0.9699106518864582, 0), z_dir=(0.9699106518864582, -0.24346114137000507, 0))) as chamfer_2_piece_5:
        Polygon((1 + CHAMFER_2_SIZE, 0), (1, -CHAMFER_2_SIZE), (1, 0), align=None)
    revolve(axis=Axis((-27.107825257, -2.2, 0), (0, 0, -1)), revolution_arc=118.512756614, mode=Mode.SUBTRACT)
    with BuildSketch(Plane(origin=(0, 0, 0), x_dir=(0.8153846153846158, 0.5789196222223618, 0), z_dir=(0.5789196222223618, -0.8153846153846158, 0))) as chamfer_2_piece_6:
        Polygon((2.25, CHAMFER_2_SIZE), (2.25 - CHAMFER_2_SIZE, 0), (2.25, 0), align=None)
    revolve(axis=Axis((0, 0, 0), (0, 0, 1)), revolution_arc=187.229076359, mode=Mode.SUBTRACT)
    with BuildSketch(Plane(origin=(2.65, 1.881488772, 0), x_dir=(0.8703565626431259, 0.4924220282075555, 0), z_dir=(-0.4924220282075555, 0.8703565626431259, 0))) as chamfer_2_piece_7_section:
        Polygon((1, -CHAMFER_2_SIZE), (1 + CHAMFER_2_SIZE, 0), (1, 0), align=None)
    chamfer_2_piece_7 = revolve(axis=Axis((2.65, 1.881488772, 0), (0, 0, -1)), revolution_arc=174.125308708, mode=Mode.PRIVATE)
    chamfer_2_piece_7 = split(chamfer_2_piece_7, bisect_by=Plane(origin=(3.65, 0.835809234, 0.097562579), z_dir=(-1, 0, 0)), keep=Keep.TOP, mode=Mode.PRIVATE)
    add(chamfer_2_piece_7, mode=Mode.SUBTRACT)
    with BuildSketch(Plane(origin=(-29.5, 0, 0), x_dir=(0.7360537670095794, -0.6769230769230783, 0), z_dir=(-0.6769230769230783, -0.7360537670095794, 0))) as chamfer_2_piece_8:
        Polygon((2.25, CHAMFER_2_SIZE), (2.25 - CHAMFER_2_SIZE, 0), (2.25, 0), align=None)
    revolve(axis=Axis((-29.5, 0, 0), (0, 0, 1)), revolution_arc=187.229076359, mode=Mode.SUBTRACT)
    with BuildSketch(Plane(origin=(-29.5, 30.6, 0), x_dir=(-0.8153846153846124, -0.5789196222223667, 0), z_dir=(-0.5789196222223667, 0.8153846153846124, 0))) as chamfer_2_piece_9:
        Polygon((2.25, CHAMFER_2_SIZE), (2.25 - CHAMFER_2_SIZE, 0), (2.25, 0), align=None)
    revolve(axis=Axis((-29.5, 30.6, 0), (0, 0, 1)), revolution_arc=289.250819106, mode=Mode.SUBTRACT)

    # Эскиз26 → Бобышка-Вытянуть6 (add)
    with BuildSketch(Plane(origin=(0, 0, 13.73), x_dir=(-1, 0, 0), z_dir=(0, 0, -1))):
        with BuildLine():
            Line((-3.65, 32.481488772), (-3.65, 28.718511228))
            ThreePointArc((-3.65, 28.718511228), (-2.95382181, 29.671240102), (-1.834615385, 29.29743085))
            ThreePointArc((-1.834615385, 29.29743085), (2.25, 30.6), (-1.834615385, 31.90256915))
            ThreePointArc((-1.834615385, 31.90256915), (-2.95382181, 31.528759898), (-3.65, 32.481488772))
        make_face()
    extrude(amount=EXTRUDE_6_DEPTH)

    # Отверстие обработанное метчиком M2.51
    with Locations(Plane.XY.offset(14.43)):
        with Locations((0, 30.6)):
            Hole(HOLE_WIZARD_M2_51_D / 2, depth=HOLE_WIZARD_M2_51_DEPTH)
            with Locations((0, 0, -(HOLE_WIZARD_M2_51_DEPTH + HOLE_WIZARD_M2_51_TIP / 2))):  # 118° drill point
                Cone(0, HOLE_WIZARD_M2_51_D / 2, HOLE_WIZARD_M2_51_TIP, mode=Mode.SUBTRACT)

    # Фаска3
    chamfer_3_edges = [part_1.edges().sort_by_distance(p)[0] for p in [
        (-30.525, 30.6, 14.43),
        (-30.525, 0, 14.43),
        (-1.025, 0, 14.43),
        (1.025, 30.6, 14.43),
    ]]
    chamfer(chamfer_3_edges, length=CHAMFER_3_SIZE)

    # Фаска4
    chamfer_4_edges = [part_1.edges().sort_by_distance(p)[0] for p in [
        (-33.088477631, 43.538477631, 14.43),
        (-33.85, 20.2, 14.43),
        (-33.088477631, -3.138477631, 14.43),
        (-14.75, -3.9, 14.43),
        (3.588477631, -3.138477631, 14.43),
        (4.35, 20.2, 14.43),
        (3.588477631, 43.538477631, 14.43),
        (-14.75, 44.3, 14.43),
    ]]
    chamfer(chamfer_4_edges, length=CHAMFER_4_SIZE)

    # Фаска7
    chamfer_7_edges = [part_1.edges().sort_by_distance(p)[0] for p in [
        (2.95382181, 29.671240102, 11.23),
        (-2.25, 30.6, 11.23),
        (2.95382181, 31.528759898, 11.23),
    ]]
    chamfer(chamfer_7_edges, length=CHAMFER_7_SIZE)


solid = part_1.part
